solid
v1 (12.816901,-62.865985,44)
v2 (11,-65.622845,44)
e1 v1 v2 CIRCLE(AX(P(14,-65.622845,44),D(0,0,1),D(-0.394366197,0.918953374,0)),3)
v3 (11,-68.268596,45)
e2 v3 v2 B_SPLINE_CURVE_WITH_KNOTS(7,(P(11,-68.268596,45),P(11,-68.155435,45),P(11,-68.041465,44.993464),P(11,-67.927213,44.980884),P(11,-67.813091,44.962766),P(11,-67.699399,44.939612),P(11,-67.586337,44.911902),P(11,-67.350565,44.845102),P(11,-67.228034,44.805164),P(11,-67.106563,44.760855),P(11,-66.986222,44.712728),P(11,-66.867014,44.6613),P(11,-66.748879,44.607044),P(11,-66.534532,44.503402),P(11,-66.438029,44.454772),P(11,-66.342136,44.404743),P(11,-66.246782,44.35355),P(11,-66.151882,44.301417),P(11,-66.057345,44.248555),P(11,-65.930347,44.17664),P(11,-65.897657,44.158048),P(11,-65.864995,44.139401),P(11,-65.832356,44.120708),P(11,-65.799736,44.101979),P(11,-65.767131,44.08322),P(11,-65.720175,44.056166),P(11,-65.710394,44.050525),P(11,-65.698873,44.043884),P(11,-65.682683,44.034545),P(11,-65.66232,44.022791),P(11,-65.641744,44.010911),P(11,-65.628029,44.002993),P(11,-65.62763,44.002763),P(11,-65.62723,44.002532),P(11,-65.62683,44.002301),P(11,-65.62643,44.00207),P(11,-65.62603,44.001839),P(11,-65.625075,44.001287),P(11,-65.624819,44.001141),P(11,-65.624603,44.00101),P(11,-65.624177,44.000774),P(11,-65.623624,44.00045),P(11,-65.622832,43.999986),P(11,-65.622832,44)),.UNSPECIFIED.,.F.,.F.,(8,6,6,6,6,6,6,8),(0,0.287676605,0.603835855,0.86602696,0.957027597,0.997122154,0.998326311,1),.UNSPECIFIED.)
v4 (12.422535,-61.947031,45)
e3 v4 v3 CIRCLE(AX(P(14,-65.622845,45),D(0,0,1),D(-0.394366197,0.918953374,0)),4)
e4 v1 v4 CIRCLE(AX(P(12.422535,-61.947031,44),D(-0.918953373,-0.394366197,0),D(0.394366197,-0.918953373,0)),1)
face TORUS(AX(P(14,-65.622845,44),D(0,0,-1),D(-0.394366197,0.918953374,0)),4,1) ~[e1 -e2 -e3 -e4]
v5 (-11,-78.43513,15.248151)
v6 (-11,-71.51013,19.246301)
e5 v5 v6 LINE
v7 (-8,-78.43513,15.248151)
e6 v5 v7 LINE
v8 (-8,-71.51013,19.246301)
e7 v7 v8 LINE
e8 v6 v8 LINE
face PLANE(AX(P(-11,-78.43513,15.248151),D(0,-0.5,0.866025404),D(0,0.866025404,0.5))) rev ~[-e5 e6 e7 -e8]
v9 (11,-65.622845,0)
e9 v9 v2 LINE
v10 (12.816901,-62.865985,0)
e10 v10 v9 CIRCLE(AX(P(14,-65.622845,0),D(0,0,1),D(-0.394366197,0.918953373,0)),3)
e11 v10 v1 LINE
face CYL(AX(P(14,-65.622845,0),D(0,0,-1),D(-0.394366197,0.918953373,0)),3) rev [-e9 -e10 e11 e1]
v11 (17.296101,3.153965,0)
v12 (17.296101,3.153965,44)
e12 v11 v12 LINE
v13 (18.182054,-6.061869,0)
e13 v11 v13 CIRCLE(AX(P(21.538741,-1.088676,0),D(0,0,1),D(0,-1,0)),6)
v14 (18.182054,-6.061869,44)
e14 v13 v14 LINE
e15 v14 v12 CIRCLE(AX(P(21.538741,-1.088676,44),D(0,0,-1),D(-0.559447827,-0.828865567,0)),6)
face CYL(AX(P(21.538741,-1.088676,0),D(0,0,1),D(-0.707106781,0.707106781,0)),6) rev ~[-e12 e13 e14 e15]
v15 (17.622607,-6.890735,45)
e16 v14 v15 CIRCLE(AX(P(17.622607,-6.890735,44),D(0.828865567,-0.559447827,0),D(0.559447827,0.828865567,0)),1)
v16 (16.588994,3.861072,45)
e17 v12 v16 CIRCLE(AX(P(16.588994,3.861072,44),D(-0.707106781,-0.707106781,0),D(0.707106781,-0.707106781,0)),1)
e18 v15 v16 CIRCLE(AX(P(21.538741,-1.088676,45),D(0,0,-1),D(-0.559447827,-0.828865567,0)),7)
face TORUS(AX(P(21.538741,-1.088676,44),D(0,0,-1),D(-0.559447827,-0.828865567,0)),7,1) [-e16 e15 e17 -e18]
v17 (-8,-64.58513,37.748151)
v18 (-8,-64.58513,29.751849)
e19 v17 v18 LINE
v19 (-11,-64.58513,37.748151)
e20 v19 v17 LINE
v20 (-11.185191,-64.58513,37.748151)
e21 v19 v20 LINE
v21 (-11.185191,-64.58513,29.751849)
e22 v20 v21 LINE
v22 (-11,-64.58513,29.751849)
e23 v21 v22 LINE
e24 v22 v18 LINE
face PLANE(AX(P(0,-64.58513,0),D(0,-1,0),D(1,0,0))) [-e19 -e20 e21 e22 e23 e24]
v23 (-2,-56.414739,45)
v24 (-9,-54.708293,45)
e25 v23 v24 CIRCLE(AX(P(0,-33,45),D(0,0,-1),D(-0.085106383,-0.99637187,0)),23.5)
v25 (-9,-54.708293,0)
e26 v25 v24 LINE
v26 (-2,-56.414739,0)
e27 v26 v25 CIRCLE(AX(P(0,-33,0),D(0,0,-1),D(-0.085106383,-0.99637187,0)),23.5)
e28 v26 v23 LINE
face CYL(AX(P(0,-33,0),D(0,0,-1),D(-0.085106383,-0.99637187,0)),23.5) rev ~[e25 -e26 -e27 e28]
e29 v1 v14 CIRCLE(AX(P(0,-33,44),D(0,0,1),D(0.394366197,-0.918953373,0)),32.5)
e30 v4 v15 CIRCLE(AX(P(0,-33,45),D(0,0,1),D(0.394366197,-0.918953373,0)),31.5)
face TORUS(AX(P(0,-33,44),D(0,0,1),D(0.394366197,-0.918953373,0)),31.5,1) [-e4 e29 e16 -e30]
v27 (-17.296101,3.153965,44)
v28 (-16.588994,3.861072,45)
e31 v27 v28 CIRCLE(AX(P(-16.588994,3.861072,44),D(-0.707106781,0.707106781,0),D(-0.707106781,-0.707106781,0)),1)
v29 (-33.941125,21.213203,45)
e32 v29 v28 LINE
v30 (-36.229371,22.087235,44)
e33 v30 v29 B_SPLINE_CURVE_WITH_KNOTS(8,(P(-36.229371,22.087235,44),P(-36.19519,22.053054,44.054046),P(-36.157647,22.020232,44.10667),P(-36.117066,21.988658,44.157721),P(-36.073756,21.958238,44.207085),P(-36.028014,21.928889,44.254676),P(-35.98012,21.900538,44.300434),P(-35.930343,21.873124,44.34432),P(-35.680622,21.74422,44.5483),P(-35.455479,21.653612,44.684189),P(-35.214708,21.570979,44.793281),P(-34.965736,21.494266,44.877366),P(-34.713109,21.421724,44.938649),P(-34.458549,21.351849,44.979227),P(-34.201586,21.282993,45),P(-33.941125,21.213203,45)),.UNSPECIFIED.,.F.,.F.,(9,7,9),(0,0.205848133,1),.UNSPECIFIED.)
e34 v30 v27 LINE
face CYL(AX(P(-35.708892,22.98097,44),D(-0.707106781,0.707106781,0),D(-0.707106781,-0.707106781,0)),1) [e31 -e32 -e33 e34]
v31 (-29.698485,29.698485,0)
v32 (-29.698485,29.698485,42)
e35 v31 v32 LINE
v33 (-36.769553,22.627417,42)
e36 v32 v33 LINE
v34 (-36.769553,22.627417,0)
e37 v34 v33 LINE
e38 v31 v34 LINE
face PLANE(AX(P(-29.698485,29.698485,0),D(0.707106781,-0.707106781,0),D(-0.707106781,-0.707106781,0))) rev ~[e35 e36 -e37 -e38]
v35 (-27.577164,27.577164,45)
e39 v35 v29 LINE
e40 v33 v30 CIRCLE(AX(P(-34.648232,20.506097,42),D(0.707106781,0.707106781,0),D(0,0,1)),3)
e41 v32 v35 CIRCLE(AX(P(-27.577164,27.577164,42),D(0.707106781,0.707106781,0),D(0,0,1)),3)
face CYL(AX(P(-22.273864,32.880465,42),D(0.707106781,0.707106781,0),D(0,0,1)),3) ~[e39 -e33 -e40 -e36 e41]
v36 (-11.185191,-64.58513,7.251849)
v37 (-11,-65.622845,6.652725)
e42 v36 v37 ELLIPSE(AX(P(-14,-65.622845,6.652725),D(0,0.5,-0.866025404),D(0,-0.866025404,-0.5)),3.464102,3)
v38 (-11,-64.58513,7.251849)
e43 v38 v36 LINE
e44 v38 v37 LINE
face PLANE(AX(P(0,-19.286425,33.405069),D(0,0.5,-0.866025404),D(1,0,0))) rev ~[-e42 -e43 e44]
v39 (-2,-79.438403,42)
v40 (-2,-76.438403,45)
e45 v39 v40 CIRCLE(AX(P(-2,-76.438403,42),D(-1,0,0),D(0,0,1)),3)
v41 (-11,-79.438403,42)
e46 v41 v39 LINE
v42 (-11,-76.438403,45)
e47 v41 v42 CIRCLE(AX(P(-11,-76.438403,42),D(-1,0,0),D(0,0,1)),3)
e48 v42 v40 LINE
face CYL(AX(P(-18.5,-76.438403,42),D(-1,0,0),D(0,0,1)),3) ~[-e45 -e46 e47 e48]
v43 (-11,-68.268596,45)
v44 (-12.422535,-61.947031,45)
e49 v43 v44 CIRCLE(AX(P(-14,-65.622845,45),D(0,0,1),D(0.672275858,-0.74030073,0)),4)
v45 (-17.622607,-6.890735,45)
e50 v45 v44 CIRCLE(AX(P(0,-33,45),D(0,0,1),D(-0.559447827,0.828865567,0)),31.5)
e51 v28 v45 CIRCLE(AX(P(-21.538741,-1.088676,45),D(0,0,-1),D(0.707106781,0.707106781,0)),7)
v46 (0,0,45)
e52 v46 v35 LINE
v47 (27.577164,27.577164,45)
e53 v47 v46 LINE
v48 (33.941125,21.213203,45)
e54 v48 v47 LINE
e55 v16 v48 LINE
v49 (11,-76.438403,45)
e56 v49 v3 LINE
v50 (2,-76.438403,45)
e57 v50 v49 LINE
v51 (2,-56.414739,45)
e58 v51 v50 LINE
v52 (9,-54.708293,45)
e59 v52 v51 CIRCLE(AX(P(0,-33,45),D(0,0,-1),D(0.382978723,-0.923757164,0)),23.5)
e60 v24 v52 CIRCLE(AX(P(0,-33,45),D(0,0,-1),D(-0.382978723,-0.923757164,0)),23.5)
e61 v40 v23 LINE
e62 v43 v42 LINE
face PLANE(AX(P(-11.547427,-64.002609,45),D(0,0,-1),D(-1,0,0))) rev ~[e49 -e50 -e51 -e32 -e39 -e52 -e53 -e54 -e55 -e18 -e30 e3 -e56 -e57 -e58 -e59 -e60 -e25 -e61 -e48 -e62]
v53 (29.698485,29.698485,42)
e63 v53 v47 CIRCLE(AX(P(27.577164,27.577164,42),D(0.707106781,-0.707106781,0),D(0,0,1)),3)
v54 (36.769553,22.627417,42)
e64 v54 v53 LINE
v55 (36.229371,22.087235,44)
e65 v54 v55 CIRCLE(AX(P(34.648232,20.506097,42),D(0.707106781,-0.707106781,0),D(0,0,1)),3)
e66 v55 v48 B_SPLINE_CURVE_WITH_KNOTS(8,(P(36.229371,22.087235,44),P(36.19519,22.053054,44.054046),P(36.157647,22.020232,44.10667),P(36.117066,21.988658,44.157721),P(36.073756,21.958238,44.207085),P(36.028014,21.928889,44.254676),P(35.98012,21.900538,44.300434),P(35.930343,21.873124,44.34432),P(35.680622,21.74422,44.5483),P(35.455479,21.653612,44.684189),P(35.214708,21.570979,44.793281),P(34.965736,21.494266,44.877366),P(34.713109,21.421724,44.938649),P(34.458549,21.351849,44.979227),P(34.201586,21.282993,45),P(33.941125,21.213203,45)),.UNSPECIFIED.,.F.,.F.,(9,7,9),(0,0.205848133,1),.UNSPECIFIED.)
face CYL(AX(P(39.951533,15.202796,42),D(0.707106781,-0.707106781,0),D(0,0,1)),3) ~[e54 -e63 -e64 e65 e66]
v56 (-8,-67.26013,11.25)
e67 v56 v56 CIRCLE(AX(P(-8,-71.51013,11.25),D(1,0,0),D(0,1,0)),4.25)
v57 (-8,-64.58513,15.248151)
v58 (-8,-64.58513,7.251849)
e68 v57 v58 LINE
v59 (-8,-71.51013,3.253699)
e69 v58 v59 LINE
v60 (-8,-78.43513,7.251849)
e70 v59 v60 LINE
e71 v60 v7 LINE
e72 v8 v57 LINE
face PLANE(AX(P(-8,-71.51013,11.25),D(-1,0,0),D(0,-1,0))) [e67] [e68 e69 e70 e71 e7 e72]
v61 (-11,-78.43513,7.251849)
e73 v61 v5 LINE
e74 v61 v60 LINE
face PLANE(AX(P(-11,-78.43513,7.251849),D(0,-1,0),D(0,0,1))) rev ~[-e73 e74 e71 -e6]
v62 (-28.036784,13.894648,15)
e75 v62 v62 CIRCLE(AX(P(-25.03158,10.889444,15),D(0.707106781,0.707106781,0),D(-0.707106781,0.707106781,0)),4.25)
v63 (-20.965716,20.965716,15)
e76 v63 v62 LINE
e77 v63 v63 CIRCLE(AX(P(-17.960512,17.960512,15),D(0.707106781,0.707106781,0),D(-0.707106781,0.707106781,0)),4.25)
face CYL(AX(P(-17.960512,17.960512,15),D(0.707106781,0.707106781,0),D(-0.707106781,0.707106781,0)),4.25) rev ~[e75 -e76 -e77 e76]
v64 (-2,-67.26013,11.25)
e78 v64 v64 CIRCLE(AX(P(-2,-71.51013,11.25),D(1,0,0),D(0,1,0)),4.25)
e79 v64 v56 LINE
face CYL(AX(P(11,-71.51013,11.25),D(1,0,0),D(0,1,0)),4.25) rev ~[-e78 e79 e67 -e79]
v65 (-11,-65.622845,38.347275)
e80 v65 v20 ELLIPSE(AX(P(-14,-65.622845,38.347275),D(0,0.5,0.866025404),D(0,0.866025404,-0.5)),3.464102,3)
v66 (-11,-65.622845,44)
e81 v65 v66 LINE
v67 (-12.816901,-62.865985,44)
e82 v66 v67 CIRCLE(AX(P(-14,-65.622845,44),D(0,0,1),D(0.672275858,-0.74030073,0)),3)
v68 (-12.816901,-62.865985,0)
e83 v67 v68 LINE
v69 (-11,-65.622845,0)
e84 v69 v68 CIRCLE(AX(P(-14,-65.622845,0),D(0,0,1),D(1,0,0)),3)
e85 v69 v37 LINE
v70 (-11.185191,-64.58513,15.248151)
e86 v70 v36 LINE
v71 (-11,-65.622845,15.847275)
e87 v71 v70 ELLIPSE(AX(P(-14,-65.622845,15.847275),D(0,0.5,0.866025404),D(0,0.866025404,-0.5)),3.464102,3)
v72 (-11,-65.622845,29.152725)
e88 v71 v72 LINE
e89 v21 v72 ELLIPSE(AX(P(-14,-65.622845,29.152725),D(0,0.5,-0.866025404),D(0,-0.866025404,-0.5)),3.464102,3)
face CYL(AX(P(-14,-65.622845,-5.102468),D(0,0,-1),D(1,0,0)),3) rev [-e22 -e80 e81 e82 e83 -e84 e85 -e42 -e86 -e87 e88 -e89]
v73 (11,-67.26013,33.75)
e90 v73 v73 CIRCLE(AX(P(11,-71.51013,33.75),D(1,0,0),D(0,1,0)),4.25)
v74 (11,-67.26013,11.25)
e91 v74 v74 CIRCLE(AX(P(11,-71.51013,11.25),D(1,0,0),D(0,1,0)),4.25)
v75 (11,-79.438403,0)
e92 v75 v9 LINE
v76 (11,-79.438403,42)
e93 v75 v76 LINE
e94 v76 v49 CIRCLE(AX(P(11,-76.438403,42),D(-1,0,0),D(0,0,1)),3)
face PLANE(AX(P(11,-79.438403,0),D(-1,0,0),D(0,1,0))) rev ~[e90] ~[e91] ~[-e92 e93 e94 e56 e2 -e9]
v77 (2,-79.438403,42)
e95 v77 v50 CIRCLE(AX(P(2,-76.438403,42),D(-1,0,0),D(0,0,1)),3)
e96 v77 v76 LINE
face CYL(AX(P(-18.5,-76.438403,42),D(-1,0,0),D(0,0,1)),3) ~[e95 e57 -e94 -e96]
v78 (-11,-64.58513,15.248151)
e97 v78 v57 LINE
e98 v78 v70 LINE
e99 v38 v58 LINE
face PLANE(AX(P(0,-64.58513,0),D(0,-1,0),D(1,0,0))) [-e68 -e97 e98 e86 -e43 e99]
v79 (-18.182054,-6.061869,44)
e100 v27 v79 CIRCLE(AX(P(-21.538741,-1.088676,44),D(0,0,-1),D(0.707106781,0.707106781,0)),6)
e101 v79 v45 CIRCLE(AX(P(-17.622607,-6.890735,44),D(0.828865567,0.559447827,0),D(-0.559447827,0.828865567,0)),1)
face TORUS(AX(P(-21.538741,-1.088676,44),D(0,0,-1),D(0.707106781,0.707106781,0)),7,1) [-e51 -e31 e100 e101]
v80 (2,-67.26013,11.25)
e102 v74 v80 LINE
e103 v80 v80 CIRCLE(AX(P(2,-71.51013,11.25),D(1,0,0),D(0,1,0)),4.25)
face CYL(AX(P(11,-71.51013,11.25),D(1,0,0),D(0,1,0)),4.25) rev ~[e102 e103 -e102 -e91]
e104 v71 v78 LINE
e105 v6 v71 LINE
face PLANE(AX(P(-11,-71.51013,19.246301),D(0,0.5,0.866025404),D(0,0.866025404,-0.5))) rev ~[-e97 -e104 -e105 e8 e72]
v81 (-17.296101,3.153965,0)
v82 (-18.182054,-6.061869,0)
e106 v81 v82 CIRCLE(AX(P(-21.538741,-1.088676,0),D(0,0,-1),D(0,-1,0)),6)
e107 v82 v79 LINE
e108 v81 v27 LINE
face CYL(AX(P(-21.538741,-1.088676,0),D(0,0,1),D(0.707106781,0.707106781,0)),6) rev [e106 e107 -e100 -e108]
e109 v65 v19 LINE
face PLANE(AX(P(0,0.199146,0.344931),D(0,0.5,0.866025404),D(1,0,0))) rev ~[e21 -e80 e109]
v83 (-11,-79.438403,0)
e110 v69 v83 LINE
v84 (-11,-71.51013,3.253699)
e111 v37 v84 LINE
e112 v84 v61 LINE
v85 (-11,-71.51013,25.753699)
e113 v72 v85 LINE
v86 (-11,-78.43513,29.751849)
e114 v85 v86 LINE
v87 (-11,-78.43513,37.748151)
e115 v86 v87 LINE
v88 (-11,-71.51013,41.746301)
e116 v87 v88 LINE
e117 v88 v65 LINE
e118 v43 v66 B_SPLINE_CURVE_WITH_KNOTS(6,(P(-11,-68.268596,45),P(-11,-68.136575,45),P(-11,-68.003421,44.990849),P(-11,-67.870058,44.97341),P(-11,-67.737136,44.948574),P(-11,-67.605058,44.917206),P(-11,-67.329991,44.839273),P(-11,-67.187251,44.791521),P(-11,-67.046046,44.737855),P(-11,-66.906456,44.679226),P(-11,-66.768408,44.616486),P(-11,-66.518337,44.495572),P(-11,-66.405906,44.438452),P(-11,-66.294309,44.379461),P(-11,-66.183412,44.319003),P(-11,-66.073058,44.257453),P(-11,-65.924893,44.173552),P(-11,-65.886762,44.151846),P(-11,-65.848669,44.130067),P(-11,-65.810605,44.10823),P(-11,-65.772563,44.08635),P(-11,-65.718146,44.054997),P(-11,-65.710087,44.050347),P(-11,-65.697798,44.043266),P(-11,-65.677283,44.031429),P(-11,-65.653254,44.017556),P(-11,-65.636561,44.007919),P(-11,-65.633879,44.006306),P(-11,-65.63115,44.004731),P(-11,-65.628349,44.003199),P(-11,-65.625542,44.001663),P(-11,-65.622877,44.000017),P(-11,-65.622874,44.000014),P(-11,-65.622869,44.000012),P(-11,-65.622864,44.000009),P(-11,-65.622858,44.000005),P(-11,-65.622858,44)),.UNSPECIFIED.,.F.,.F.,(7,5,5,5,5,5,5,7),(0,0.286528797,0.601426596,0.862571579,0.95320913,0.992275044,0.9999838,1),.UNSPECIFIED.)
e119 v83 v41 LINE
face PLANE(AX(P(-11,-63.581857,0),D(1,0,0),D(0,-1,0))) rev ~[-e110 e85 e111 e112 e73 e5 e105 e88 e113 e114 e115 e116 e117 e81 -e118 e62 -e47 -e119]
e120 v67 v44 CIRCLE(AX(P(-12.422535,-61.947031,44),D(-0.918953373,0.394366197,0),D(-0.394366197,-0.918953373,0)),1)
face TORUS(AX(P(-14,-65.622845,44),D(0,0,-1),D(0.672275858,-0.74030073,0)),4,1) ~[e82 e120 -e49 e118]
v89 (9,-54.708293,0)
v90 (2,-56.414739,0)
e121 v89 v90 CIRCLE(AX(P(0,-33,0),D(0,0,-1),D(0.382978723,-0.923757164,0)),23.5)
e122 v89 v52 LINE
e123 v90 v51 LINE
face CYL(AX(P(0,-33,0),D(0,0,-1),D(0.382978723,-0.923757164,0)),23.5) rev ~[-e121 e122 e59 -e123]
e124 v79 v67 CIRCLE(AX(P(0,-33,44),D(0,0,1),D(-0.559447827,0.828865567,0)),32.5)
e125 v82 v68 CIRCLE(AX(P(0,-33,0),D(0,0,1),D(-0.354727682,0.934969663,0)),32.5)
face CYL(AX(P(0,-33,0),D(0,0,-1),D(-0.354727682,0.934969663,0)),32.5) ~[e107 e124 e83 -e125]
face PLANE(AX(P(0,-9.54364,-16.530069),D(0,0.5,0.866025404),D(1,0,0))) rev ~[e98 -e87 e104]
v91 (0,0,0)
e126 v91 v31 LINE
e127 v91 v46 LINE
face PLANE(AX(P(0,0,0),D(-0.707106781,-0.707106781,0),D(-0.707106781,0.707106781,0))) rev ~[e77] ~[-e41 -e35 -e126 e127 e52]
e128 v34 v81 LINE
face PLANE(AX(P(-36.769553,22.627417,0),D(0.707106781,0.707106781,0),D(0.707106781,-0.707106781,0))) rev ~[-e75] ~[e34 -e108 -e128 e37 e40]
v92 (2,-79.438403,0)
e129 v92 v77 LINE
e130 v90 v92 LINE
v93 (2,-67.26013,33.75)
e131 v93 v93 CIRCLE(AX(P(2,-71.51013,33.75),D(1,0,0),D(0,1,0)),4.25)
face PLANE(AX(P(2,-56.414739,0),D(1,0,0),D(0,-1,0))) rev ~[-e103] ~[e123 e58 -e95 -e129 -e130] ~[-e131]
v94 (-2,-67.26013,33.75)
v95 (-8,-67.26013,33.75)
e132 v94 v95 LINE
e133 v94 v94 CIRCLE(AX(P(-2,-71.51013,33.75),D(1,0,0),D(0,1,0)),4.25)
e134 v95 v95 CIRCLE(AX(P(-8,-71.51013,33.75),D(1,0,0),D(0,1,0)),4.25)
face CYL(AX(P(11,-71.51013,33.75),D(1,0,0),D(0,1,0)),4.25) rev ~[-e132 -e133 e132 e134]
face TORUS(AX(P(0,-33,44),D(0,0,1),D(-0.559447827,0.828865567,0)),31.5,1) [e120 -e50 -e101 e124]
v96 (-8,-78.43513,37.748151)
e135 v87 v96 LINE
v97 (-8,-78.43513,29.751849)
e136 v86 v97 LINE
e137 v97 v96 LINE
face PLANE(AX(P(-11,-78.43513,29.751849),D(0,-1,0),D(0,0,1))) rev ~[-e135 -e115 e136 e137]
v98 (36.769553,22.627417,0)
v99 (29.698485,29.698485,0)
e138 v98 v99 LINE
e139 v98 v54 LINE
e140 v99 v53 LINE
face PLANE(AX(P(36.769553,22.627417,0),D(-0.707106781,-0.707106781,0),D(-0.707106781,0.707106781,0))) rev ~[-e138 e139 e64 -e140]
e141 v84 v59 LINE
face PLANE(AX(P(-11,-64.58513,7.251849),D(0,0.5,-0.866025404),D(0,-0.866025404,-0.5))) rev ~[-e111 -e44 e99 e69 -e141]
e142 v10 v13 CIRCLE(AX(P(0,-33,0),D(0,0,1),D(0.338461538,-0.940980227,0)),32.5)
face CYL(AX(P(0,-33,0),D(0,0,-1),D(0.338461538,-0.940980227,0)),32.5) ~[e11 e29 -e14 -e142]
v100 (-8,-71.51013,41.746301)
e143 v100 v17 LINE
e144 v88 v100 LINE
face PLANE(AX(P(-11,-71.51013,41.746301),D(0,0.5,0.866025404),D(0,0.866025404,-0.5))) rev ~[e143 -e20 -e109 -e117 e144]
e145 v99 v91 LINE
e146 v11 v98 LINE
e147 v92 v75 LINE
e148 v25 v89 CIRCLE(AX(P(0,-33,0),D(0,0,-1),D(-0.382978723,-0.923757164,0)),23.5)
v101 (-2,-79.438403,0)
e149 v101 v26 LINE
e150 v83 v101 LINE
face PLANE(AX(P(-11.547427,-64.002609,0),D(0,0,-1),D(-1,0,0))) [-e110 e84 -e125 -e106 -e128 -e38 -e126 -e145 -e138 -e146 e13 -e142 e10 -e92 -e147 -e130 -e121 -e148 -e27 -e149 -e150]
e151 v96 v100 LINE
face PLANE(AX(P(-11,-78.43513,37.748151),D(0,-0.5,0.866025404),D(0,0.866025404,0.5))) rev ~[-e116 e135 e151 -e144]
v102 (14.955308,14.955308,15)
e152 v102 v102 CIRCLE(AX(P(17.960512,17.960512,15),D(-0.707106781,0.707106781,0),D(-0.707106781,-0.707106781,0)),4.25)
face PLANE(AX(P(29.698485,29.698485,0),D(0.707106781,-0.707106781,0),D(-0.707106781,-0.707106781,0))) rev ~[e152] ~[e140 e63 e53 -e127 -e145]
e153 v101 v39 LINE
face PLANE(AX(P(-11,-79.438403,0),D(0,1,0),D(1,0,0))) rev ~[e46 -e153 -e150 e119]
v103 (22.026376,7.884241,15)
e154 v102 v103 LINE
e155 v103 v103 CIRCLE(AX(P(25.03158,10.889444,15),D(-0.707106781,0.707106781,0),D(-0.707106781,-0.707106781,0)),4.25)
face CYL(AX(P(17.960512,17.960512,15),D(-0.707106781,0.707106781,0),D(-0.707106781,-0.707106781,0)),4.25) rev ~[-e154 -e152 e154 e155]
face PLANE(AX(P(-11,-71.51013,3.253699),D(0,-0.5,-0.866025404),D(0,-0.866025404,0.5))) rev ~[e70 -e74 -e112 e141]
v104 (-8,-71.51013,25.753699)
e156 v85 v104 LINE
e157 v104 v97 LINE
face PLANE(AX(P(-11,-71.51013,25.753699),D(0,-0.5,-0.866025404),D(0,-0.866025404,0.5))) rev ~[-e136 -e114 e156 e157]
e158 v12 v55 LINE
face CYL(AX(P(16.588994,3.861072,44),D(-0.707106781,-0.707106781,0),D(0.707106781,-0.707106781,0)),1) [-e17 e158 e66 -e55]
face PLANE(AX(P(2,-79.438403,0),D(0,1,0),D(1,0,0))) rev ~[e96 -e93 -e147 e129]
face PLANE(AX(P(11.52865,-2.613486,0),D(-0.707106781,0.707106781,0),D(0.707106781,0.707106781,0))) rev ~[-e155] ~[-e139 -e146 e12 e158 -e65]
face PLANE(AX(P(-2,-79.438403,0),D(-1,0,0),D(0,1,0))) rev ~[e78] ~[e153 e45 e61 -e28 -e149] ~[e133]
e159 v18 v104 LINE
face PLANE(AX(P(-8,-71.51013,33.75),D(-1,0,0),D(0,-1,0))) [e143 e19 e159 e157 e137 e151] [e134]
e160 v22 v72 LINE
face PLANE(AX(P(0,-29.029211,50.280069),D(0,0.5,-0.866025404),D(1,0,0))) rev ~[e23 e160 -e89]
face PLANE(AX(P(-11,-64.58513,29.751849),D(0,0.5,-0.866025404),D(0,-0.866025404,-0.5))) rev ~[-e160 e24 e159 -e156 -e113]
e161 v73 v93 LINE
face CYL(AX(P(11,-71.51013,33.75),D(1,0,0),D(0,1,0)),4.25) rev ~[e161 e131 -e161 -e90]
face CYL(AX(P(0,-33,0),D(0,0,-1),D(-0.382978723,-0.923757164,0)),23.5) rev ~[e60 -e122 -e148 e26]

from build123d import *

# Parameters (mm, degrees)
F1_DEPTH      = 45
F2_R          = 4.25
F3_DEPTH      = 10
F4_R          = 4.25
F5_DEPTH      = 10
F6_R          = 4.25
F7_DEPTH      = 22
F9_DEPTH      = 3
F10_R         = 6
F11_T1_DEPTH  = 45
F11_T6_DEPTH  = 50.1024684741
F11_T11_DEPTH = 50.1024684741
F11_T17_DEPTH = 55.2049369483
F11_T23_DEPTH = 50.1024684741
F11_T25_DEPTH = 24
F11_T27_DEPTH = 24
F11_T29_DEPTH = 25
F11_T31_DEPTH = 25
F12_T3_ANGLE  = 122.7559288298
F12_T6_ANGLE  = 114.5305881861
F12_T9_ANGLE  = 100.9823800972
F12_T12_DEPTH = 27.0396198775
F12_T15_DEPTH = 27.0396198775
F12_T18_ANGLE = 100.9823800972
F12_T21_ANGLE = 114.5305881861
F12_T24_ANGLE = 122.7559288298


# Not quite as in the source:
# - a fillet or chamfer that OpenCascade refuses, or shapes differently, is made with other operations: its cross-section is extruded or revolved along the edge and cut away or added


with BuildPart() as f1:
    # F0 (on Top) → F1 (new body)
    with BuildSketch(Plane.XY):
        with BuildLine():
            Line((29.6984848098, 29.6984848098), (0, 0))
            Line((0, 0), (-29.6984848098, 29.6984848098))
            Line((-29.6984848098, 29.6984848098), (-36.7695526217, 22.627416998))
            Line((-36.7695526217, 22.627416998), (-11.5286496808, -2.613485943))
            ThreePointArc((-11.5286496808, -2.613485943), (-32.4987783251, -33.2817931394), (-11, -63.5818573667))
            ThreePointArc((-11, -63.5818573667), (-8.6210949019, -64.3357100238), (-6.1913611889, -64.9048122801))
            Line((-6.1913611889, -64.9048122801), (-9, -54.7082933461))
            ThreePointArc((-9, -54.7082933461), (0, -9.5), (9, -54.7082933461))
            Line((9, -54.7082933461), (6.1913611889, -64.9048122801))
            ThreePointArc((6.1913611889, -64.9048122801), (8.6210949019, -64.3357100238), (11, -63.5818573667))
            ThreePointArc((11, -63.5818573667), (32.4987783251, -33.2817931394), (11.5286496808, -2.613485943))
            Line((11.5286496808, -2.613485943), (36.7695526217, 22.627416998))
            Line((36.7695526217, 22.627416998), (29.6984848098, 29.6984848098))
        make_face()
        with BuildLine():
            ThreePointArc((-6.1913611889, -64.9048122801), (-8.6210949019, -64.3357100238), (-11, -63.5818573667))
            Line((-11, -63.5818573667), (-11, -79.4384031666))
            Line((-11, -79.4384031666), (-2, -79.4384031666))
            Line((-2, -79.4384031666), (-2, -67.4147389479))
            Line((-2, -67.4147389479), (-5.5, -67.4147389479))
            Line((-5.5, -67.4147389479), (-6.1913611889, -64.9048122801))
        make_face()
        with BuildLine():
            Line((11, -79.4384031666), (11, -63.5818573667))
            ThreePointArc((11, -63.5818573667), (8.6210949019, -64.3357100238), (6.1913611889, -64.9048122801))
            Line((6.1913611889, -64.9048122801), (5.5, -67.4147389479))
            Line((5.5, -67.4147389479), (2, -67.4147389479))
            Line((2, -67.4147389479), (2, -79.4384031666))
            Line((2, -79.4384031666), (11, -79.4384031666))
        make_face()
        with BuildLine():
            Line((-9, -54.7082933461), (-6.1913611889, -64.9048122801))
            ThreePointArc((-6.1913611889, -64.9048122801), (-4.1043610148, -65.2397925034), (-2, -65.4384031666))
            Line((-2, -65.4384031666), (-2, -56.4147389479))
            ThreePointArc((-2, -56.4147389479), (-5.565787379, -55.8313821494), (-9, -54.7082933461))
        make_face()
        with BuildLine():
            ThreePointArc((2, -65.4384031666), (4.1043610148, -65.2397925034), (6.1913611889, -64.9048122801))
            Line((6.1913611889, -64.9048122801), (9, -54.7082933461))
            ThreePointArc((9, -54.7082933461), (5.565787379, -55.8313821494), (2, -56.4147389479))
            Line((2, -56.4147389479), (2, -65.4384031666))
        make_face()
        with BuildLine():
            ThreePointArc((-2, -65.4384031666), (-4.1043610148, -65.2397925034), (-6.1913611889, -64.9048122801))
            Line((-6.1913611889, -64.9048122801), (-5.5, -67.4147389479))
            Line((-5.5, -67.4147389479), (-2, -67.4147389479))
            Line((-2, -67.4147389479), (-2, -65.4384031666))
        make_face()
        with BuildLine():
            Line((5.5, -67.4147389479), (6.1913611889, -64.9048122801))
            ThreePointArc((6.1913611889, -64.9048122801), (4.1043610148, -65.2397925034), (2, -65.4384031666))
            Line((2, -65.4384031666), (2, -67.4147389479))
            Line((2, -67.4147389479), (5.5, -67.4147389479))
        make_face()
    extrude(amount=F1_DEPTH)

    # F2 (on face) → F3 (cut, through all)
    with BuildSketch(Plane(origin=(0, 0, 0), x_dir=(-0.7071067812, -0.7071067812, 0), z_dir=(-0.7071067812, 0.7071067812, 0))):
        with Locations((-25.4, 15)):
            Circle(F2_R)
    extrude(amount=-F3_DEPTH, mode=Mode.SUBTRACT)

    # F4 (on face) → F5 (cut, through all)
    with BuildSketch(Plane(origin=(0, 0, 0), x_dir=(-0.7071067812, 0.7071067812, 0), z_dir=(0.7071067812, 0.7071067812, 0))):
        with Locations((25.4, 15)):
            Circle(F4_R)
    extrude(amount=-F5_DEPTH, mode=Mode.SUBTRACT)

    # F6 (on face) → F7 (cut, through all)
    with BuildSketch(Plane.YZ.offset(11)):
        with Locations((-71.5101302667, 33.75)):
            Circle(F6_R)
        with Locations((-71.5101302667, 11.25)):
            Circle(F6_R)
    extrude(amount=-F7_DEPTH, mode=Mode.SUBTRACT)

    # F8 (on face) → F9 (cut)
    with BuildSketch(Plane(origin=(-11, 0, 0), x_dir=(0, -1, 0), z_dir=(-1, 0, 0))):
        Polygon((78.4351302667, 37.7481506141), (71.5101302667, 41.7463012283), (64.5851302667, 37.7481506141), (64.5851302667, 29.7518493859), (71.5101302667, 25.7536987717), (78.4351302667, 29.7518493859), align=None)
        Polygon((71.5101302667, 19.2463012283), (64.5851302667, 15.2481506141), (64.5851302667, 7.2518493859), (71.5101302667, 3.2536987717), (78.4351302667, 7.2518493859), (78.4351302667, 15.2481506141), align=None)
    extrude(amount=-F9_DEPTH, mode=Mode.SUBTRACT)

    # F10
    f10_edges = [f1.edges().sort_by_distance(p)[0] for p in [
        (-11.52865, -2.613486, 22.5),
        (11.52865, -2.613486, 22.5),
    ]]
    fillet(f10_edges, radius=F10_R)

    # F11: fillet of radius 3 on 6 edges, made by hand

    # F11_s2 → F11_t1 (join)
    with BuildSketch(Plane.XY):
        with BuildLine():
            ThreePointArc((12.8169014085, -62.8659846361), (11.4950752731, -63.9719807061), (11, -65.6228447564))
            Line((11, -65.6228447564), (11, -63.5818573667))
            ThreePointArc((11, -63.5818573667), (11.9138287975, -63.2375707256), (12.8169014085, -62.8659846361))
        make_face()
    extrude(amount=F11_T1_DEPTH)


with BuildPart() as f11_tool4:
    # F11_s5 → F11_t6 (new body)
    with BuildSketch(Plane.XY):
        with BuildLine():
            ThreePointArc((-11, -65.6228447564), (-11.4950752731, -63.9719807061), (-12.8169014085, -62.8659846361))
            ThreePointArc((-12.8169014085, -62.8659846361), (-11.9138287975, -63.2375707256), (-11, -63.5818573667))
            Line((-11, -63.5818573667), (-11, -65.6228447564))
        make_face()
    extrude(amount=F11_T6_DEPTH)

    split(bisect_by=Plane(origin=(0, -19.286425463, 33.4050687982), x_dir=(1, 0, 0), z_dir=(0, 0.5, -0.8660254038)), keep=Keep.TOP)


with BuildPart() as f1_1:
    add(f1.part)

    # F11_t3: union F11_tool4
    add(f11_tool4.part)


with BuildPart() as f11_tool9:
    # F11_s10 → F11_t11 (new body)
    with BuildSketch(Plane.XY.offset(-5.1024684741)):
        with BuildLine():
            ThreePointArc((-11, -65.6228447564), (-11.4950752731, -63.9719807061), (-12.8169014085, -62.8659846361))
            ThreePointArc((-12.8169014085, -62.8659846361), (-11.9138287975, -63.2375707256), (-11, -63.5818573667))
            Line((-11, -63.5818573667), (-11, -65.6228447564))
        make_face()
    extrude(amount=F11_T11_DEPTH)

    split(bisect_by=Plane.XZ.offset(64.5851302667), keep=Keep.BOTTOM)

    split(bisect_by=Plane(origin=(0, -19.286425463, 33.4050687982), x_dir=(1, 0, 0), z_dir=(0, -0.5, 0.8660254038)), keep=Keep.TOP)


with BuildPart() as f1_2:
    add(f1_1.part)

    # F11_t8: union F11_tool9
    add(f11_tool9.part)


with BuildPart() as f11_tool15:
    # F11_s16 → F11_t17 (new body)
    with BuildSketch(Plane.XY.offset(-5.1024684741)):
        with BuildLine():
            ThreePointArc((-11, -65.6228447564), (-11.4950752731, -63.9719807061), (-12.8169014085, -62.8659846361))
            ThreePointArc((-12.8169014085, -62.8659846361), (-11.9138287975, -63.2375707256), (-11, -63.5818573667))
            Line((-11, -63.5818573667), (-11, -65.6228447564))
        make_face()
    extrude(amount=F11_T17_DEPTH)

    split(bisect_by=Plane(origin=(0, -29.0292112555, 50.2800687982), x_dir=(1, 0, 0), z_dir=(0, 0.5, -0.8660254038)), keep=Keep.TOP)

    split(bisect_by=Plane(origin=(0, -9.5436396704, -16.5300687982), x_dir=(1, 0, 0), z_dir=(0, 0.5, 0.8660254038)), keep=Keep.TOP)


with BuildPart() as f1_3:
    add(f1_2.part)

    # F11_t14: union F11_tool15
    add(f11_tool15.part)


with BuildPart() as f11_tool21:
    # F11_s22 → F11_t23 (new body)
    with BuildSketch(Plane.XY.offset(-5.1024684741)):
        with BuildLine():
            ThreePointArc((-11, -65.6228447564), (-11.4950752731, -63.9719807061), (-12.8169014085, -62.8659846361))
            ThreePointArc((-12.8169014085, -62.8659846361), (-11.9138287975, -63.2375707256), (-11, -63.5818573667))
            Line((-11, -63.5818573667), (-11, -65.6228447564))
        make_face()
    extrude(amount=F11_T23_DEPTH)

    split(bisect_by=Plane(origin=(0, 0.1991461222, 0.3449312018), x_dir=(1, 0, 0), z_dir=(0, 0.5, 0.8660254038)), keep=Keep.TOP)


with BuildPart() as f1_4:
    add(f1_3.part)

    # F11_t20: union F11_tool21
    add(f11_tool21.part)

    # F11_s26 → F11_t25 (cut)
    with BuildSketch(Plane.YZ.offset(-18.5)):
        with BuildLine():
            ThreePointArc((-76.4384031666, 45), (-78.5597235102, 44.1213203436), (-79.4384031666, 42))
            Line((-79.4384031666, 42), (-79.4384031666, 45))
            Line((-79.4384031666, 45), (-76.4384031666, 45))
        make_face()
    extrude(amount=F11_T25_DEPTH, mode=Mode.SUBTRACT)

    # F11_s28 → F11_t27 (cut)
    with BuildSketch(Plane.YZ.offset(-5.5)):
        with BuildLine():
            ThreePointArc((-76.4384031666, 45), (-78.5597235102, 44.1213203436), (-79.4384031666, 42))
            Line((-79.4384031666, 42), (-79.4384031666, 45))
            Line((-79.4384031666, 45), (-76.4384031666, 45))
        make_face()
    extrude(amount=F11_T27_DEPTH, mode=Mode.SUBTRACT)

    # F11_s30 → F11_t29 (cut)
    with BuildSketch(Plane(origin=(5.3033008589, 5.3033008589, 0), x_dir=(0, 0, 1), z_dir=(-0.7071067812, -0.7071067812, 0))):
        with BuildLine():
            ThreePointArc((45, 39), (44.1213203436, 41.1213203436), (42, 42))
            Line((42, 42), (45, 42))
            Line((45, 42), (45, 39))
        make_face()
    extrude(amount=F11_T29_DEPTH, mode=Mode.SUBTRACT)

    # F11_s32 → F11_t31 (cut)
    with BuildSketch(Plane(origin=(12.3743686708, -12.3743686708, 0), x_dir=(0, 0, 1), z_dir=(-0.7071067812, 0.7071067812, 0))):
        with BuildLine():
            ThreePointArc((45, 39), (44.1213203436, 41.1213203436), (42, 42))
            Line((42, 42), (45, 42))
            Line((45, 42), (45, 39))
        make_face()
    extrude(amount=F11_T31_DEPTH, mode=Mode.SUBTRACT)

    # F12: fillet of radius 1 on 8 edges, made by hand


with BuildPart() as f12_tool1:
    # F12_s2 → F12_t3 (revolve)
    with BuildSketch(Plane(origin=(-11.9593368598, -5.1323150169, 0), x_dir=(0, 0, 1), z_dir=(-0.9189533734, -0.3943661972, 0))):
        with BuildLine():
            ThreePointArc((44, -62.8254613228), (44.7071067812, -62.532568104), (45, -61.8254613228))
            Line((45, -61.8254613228), (45, -62.8254613228))
            Line((45, -62.8254613228), (44, -62.8254613228))
        make_face()
    revolve(axis=Axis((0, -33, 45), (0, 0, 1)), revolution_arc=F12_T3_ANGLE)


with BuildPart() as f12_tool4:
    # F12_s5 → F12_t6 (revolve)
    with BuildSketch(Plane(origin=(-11.9593368593, -5.1323150166, 0), x_dir=(0, 0, 1), z_dir=(0.9189533734, 0.3943661972, 0))):
        with BuildLine():
            ThreePointArc((44, 62.8254613229), (44.7071067812, 62.5325681041), (45, 61.8254613229))
            Line((45, 61.8254613229), (45, 62.8254613229))
            Line((45, 62.8254613229), (44, 62.8254613229))
        make_face()
    revolve(axis=Axis((14, -65.6228447564, 45), (0, 0, 1)), revolution_arc=F12_T6_ANGLE)


with BuildPart() as f12_tool7:
    # F12_s8 → F12_t9 (revolve)
    with BuildSketch(Plane(origin=(-10.2250328431, 10.2250328431, 0), x_dir=(0, 0, 1), z_dir=(-0.7071067812, 0.7071067812, 0))):
        with BuildLine():
            ThreePointArc((44, -10), (44.7071067812, -9.7071067812), (45, -9))
            Line((45, -9), (45, -10))
            Line((45, -10), (44, -10))
        make_face()
    revolve(axis=Axis((-21.5387413421, -1.0886756559, 45), (0, 0, -1)), revolution_arc=F12_T9_ANGLE)


with BuildPart() as f12_tool10:
    # F12_s11 → F12_t12 (new body)
    with BuildSketch(Plane(origin=(-29.3449314192, 29.3449314192, 0), x_dir=(0, 0, 1), z_dir=(0.7071067812, -0.7071067812, 0))):
        with BuildLine():
            ThreePointArc((44, 10), (44.7071067812, 9.7071067812), (45, 9))
            Line((45, 9), (45, 10))
            Line((45, 10), (44, 10))
        make_face()
    extrude(amount=F12_T12_DEPTH)


with BuildPart() as f12_tool13:
    # F12_s14 → F12_t15 (new body)
    with BuildSketch(Plane(origin=(10.2250328431, 10.2250328431, 0), x_dir=(0, 0, 1), z_dir=(0.7071067812, 0.7071067812, 0))):
        with BuildLine():
            ThreePointArc((44, 10), (44.7071067812, 9.7071067812), (45, 9))
            Line((45, 9), (45, 10))
            Line((45, 10), (44, 10))
        make_face()
    extrude(amount=F12_T15_DEPTH)


with BuildPart() as f12_tool16:
    # F12_s17 → F12_t18 (revolve)
    with BuildSketch(Plane(origin=(15.3023323399, -10.32840175, 0), x_dir=(0, 0, 1), z_dir=(0.8288655674, -0.5594478271, 0))):
        with BuildLine():
            ThreePointArc((44, -5.1474362764), (44.7071067812, -4.8545430576), (45, -4.1474362764))
            Line((45, -4.1474362764), (45, -5.1474362764))
            Line((45, -5.1474362764), (44, -5.1474362764))
        make_face()
    revolve(axis=Axis((21.5387413421, -1.0886756559, 45), (0, 0, -1)), revolution_arc=F12_T18_ANGLE)


with BuildPart() as f12_tool19:
    # F12_s20 → F12_t21 (revolve)
    with BuildSketch(Plane(origin=(-40.3322237445, -36.6261699102, 0), x_dir=(0, 0, 1), z_dir=(-0.74030073, -0.672275858, 0))):
        with BuildLine():
            ThreePointArc((44, -42.1687778654), (44.7071067812, -42.4616710842), (45, -43.1687778654))
            Line((45, -43.1687778654), (45, -42.1687778654))
            Line((45, -42.1687778654), (44, -42.1687778654))
        make_face()
    revolve(axis=Axis((-14, -65.6228447564, 45), (0, 0, 1)), revolution_arc=F12_T21_ANGLE)


with BuildPart() as f12_tool22:
    # F12_s23 → F12_t24 (revolve)
    with BuildSketch(Plane(origin=(-15.3023323399, -10.32840175, 0), x_dir=(0, 0, 1), z_dir=(0.8288655674, 0.5594478271, 0))):
        with BuildLine():
            ThreePointArc((44, -5.1474362764), (44.7071067812, -4.8545430576), (45, -4.1474362764))
            Line((45, -4.1474362764), (45, -5.1474362764))
            Line((45, -5.1474362764), (44, -5.1474362764))
        make_face()
    revolve(axis=Axis((0, -33, 45), (0, 0, 1)), revolution_arc=F12_T24_ANGLE)


with BuildPart() as f1_5:
    add(f1_4.part)

    # F12_t25: cut F12_tool1, F12_tool4, F12_tool7, F12_tool10, F12_tool13, F12_tool16, F12_tool19, F12_tool22
    add([f12_tool1.part, f12_tool4.part, f12_tool7.part, f12_tool10.part, f12_tool13.part, f12_tool16.part, f12_tool19.part, f12_tool22.part], mode=Mode.SUBTRACT)


solid = f1_5.part
